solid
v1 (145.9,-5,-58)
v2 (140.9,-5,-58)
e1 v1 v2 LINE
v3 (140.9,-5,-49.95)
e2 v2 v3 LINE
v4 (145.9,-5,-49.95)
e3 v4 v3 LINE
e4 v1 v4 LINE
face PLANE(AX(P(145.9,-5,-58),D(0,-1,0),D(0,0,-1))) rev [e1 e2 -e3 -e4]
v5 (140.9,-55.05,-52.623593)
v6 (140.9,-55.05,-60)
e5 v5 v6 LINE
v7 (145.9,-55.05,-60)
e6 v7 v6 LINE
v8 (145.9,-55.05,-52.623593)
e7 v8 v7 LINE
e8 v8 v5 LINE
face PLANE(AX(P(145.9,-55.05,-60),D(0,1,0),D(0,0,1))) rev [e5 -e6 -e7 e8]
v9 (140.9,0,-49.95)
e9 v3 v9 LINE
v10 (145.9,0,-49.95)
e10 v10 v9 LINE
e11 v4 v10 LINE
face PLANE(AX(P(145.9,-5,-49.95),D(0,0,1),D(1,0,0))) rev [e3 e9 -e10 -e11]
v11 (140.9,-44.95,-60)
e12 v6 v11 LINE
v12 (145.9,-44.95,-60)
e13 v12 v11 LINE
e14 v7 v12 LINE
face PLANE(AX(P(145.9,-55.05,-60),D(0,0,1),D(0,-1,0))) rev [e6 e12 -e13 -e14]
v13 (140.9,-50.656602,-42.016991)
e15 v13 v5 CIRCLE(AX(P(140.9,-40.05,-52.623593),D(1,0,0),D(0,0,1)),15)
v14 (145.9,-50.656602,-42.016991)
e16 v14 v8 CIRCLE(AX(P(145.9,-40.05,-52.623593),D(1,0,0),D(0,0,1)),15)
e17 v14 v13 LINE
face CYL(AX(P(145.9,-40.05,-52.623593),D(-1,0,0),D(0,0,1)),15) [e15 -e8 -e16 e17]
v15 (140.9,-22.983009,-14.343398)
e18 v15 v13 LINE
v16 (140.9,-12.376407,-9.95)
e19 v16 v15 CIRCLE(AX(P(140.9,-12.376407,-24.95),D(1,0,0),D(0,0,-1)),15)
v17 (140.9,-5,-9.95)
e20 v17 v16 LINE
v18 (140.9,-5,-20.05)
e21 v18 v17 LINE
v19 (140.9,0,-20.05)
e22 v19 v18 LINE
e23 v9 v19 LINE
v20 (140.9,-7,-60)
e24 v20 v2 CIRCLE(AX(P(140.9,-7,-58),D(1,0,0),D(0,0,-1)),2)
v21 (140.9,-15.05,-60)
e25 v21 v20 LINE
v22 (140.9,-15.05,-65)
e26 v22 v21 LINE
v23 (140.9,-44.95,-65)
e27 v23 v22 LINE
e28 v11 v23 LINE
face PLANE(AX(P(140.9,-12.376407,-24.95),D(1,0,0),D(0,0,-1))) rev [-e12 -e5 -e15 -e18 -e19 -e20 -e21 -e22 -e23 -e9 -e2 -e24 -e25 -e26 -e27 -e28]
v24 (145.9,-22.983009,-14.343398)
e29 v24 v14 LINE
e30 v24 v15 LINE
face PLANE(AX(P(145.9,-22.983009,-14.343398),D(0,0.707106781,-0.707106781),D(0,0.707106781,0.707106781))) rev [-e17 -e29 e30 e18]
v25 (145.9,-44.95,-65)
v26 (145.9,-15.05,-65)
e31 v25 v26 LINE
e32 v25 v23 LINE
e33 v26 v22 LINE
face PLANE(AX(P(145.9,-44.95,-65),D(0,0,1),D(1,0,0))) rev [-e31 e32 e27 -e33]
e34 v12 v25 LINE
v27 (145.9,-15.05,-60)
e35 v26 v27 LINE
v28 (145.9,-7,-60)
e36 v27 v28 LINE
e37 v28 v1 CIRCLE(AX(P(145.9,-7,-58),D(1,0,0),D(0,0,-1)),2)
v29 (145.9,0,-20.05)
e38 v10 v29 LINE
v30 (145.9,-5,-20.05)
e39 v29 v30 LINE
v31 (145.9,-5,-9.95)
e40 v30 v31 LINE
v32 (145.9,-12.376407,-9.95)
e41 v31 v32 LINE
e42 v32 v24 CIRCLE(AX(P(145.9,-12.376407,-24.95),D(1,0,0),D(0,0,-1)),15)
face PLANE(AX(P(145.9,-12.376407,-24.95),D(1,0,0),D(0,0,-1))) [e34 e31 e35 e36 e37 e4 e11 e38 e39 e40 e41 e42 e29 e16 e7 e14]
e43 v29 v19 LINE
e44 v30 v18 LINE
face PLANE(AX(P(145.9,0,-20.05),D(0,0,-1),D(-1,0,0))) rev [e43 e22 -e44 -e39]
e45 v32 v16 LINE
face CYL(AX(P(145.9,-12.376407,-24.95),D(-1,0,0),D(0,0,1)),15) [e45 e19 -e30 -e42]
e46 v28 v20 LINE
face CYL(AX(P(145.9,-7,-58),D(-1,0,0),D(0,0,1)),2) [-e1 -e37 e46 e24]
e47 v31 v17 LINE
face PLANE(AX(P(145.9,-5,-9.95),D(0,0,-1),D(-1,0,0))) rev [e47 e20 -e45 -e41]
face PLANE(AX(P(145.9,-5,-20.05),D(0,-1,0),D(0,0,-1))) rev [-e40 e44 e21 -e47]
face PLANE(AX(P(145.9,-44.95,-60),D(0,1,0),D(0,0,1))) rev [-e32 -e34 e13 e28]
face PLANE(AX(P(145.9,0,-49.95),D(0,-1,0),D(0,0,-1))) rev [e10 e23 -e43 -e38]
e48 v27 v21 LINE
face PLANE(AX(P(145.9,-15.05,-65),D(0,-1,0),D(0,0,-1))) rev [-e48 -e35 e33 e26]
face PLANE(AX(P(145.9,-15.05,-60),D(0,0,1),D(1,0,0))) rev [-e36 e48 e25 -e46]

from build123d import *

# Parameters (mm, degrees)
BODY_MOVE_COPY1_START         = -65
BODY_MOVE_COPY1_OUTLINE_W     = 5.1
BODY_MOVE_COPY1_OUTLINE_H     = 30.1
BODY_MOVE_COPY1_OUTLINE_R     = 2.6
BODY_MOVE_COPY1_OUTLINE_R_2   = 3.1
BODY_MOVE_COPY1_OUTLINE_R_3   = 1.55
BODY_MOVE_COPY1_OUTLINE_W_2   = 30.5
BODY_MOVE_COPY1_OUTLINE_H_2   = 14.5
BODY_MOVE_COPY1_DEPTH         = 5
BODY_MOVE_COPY1_START_2       = -5
BODY_MOVE_COPY1_2_OUTLINE_W   = 10
BODY_MOVE_COPY1_2_OUTLINE_H   = 5.2
BODY_MOVE_COPY1_2_OUTLINE_R   = 1.6
BODY_MOVE_COPY1_2_OUTLINE_W_2 = 5.1
BODY_MOVE_COPY1_2_OUTLINE_H_2 = 30.1
BODY_MOVE_COPY1_2_DEPTH       = 5
BOSS_EXTRUDE2_DEPTH           = 5


# Read off the part's stored shape, not the designer's step: Body-Move/Copy1
with BuildPart() as part:
    # Body-Move/Copy1 outline → Body-Move/Copy1 (new body)
    with BuildSketch(Plane.XY.offset(BODY_MOVE_COPY1_START)):
        Polygon((24.9, -310), (24.9, -305), (100.2, -305), (100.2, -310), (150, -310), (150, -5), (10.65, -5), (10.65, 0), (-10.65, 0), (-10.65, -5), (-150, -5), (-150, -310), (-100.2, -310), (-100.2, -305), (-24.9, -305), (-24.9, -310), align=None)
        with Locations((-143.45, -280)):
            Rectangle(BODY_MOVE_COPY1_OUTLINE_W, BODY_MOVE_COPY1_OUTLINE_H, mode=Mode.SUBTRACT)
        with Locations((-90, -157.5)):
            Circle(BODY_MOVE_COPY1_OUTLINE_R, mode=Mode.SUBTRACT)
        with Locations((-60, -157.5)):
            Circle(BODY_MOVE_COPY1_OUTLINE_R, mode=Mode.SUBTRACT)
        with Locations((143.45, -280)):
            Rectangle(BODY_MOVE_COPY1_OUTLINE_W, BODY_MOVE_COPY1_OUTLINE_H, mode=Mode.SUBTRACT)
        with Locations((65, -157.5)):
            Circle(BODY_MOVE_COPY1_OUTLINE_R_2, mode=Mode.SUBTRACT)
        with Locations((85, -157.5)):
            Circle(BODY_MOVE_COPY1_OUTLINE_R_2, mode=Mode.SUBTRACT)
        with Locations((-90, -137.5)):
            Circle(BODY_MOVE_COPY1_OUTLINE_R_3, mode=Mode.SUBTRACT)
        with Locations((-60, -137.5)):
            Circle(BODY_MOVE_COPY1_OUTLINE_R_3, mode=Mode.SUBTRACT)
        with Locations((-75, -100.25)):
            Rectangle(BODY_MOVE_COPY1_OUTLINE_W_2, BODY_MOVE_COPY1_OUTLINE_H_2, mode=Mode.SUBTRACT)
        with Locations((-143.45, -30)):
            Rectangle(BODY_MOVE_COPY1_OUTLINE_W, BODY_MOVE_COPY1_OUTLINE_H, mode=Mode.SUBTRACT)
        with Locations((143.45, -30)):
            Rectangle(BODY_MOVE_COPY1_OUTLINE_W, BODY_MOVE_COPY1_OUTLINE_H, mode=Mode.SUBTRACT)
    extrude(amount=BODY_MOVE_COPY1_DEPTH)


with BuildPart() as body_2:
    # Body-Move_Copy1 2 outline → Body-Move_Copy1 2 (new body)
    with BuildSketch(Plane(origin=(0, 0, 0), x_dir=(1, 0, 0), z_dir=(0, 1, 0)).offset(BODY_MOVE_COPY1_START_2)):
        with BuildLine():
            ThreePointArc((-95, -65), (-93.535533906, -61.464466094), (-90, -60))
            Line((-90, -60), (90, -60))
            ThreePointArc((90, -60), (93.535533906, -61.464466094), (95, -65))
            Line((95, -65), (95, -70))
            ThreePointArc((95, -70), (96.464466094, -73.535533906), (100, -75))
            Line((100, -75), (115, -75))
            ThreePointArc((115, -75), (118.535533906, -73.535533906), (120, -70))
            Line((120, -70), (120, -60))
            Line((120, -60), (145.606601718, -34.393398282))
            ThreePointArc((145.606601718, -34.393398282), (148.858192988, -29.52704805), (150, -23.786796564))
            Line((150, -23.786796564), (150, 65))
            Line((150, 65), (10.75, 65))
            Line((10.75, 65), (10.75, 60))
            Line((10.75, 60), (-10.75, 60))
            Line((-10.75, 60), (-10.75, 65))
            Line((-10.75, 65), (-150, 65))
            Line((-150, 65), (-150, -23.786796564))
            ThreePointArc((-150, -23.786796564), (-148.858192988, -29.52704805), (-145.606601718, -34.393398282))
            Line((-145.606601718, -34.393398282), (-120, -60))
            Line((-120, -60), (-120, -70))
            ThreePointArc((-120, -70), (-118.535533906, -73.535533906), (-115, -75))
            Line((-115, -75), (-100, -75))
            ThreePointArc((-100, -75), (-96.464466094, -73.535533906), (-95, -70))
            Line((-95, -70), (-95, -65))
        make_face()
        with Locations((-107.5, -67.5)):
            Rectangle(BODY_MOVE_COPY1_2_OUTLINE_W, BODY_MOVE_COPY1_2_OUTLINE_H, mode=Mode.SUBTRACT)
        with Locations((-110, -52.5)):
            Circle(BODY_MOVE_COPY1_2_OUTLINE_R, mode=Mode.SUBTRACT)
        with Locations((-5, -52.5)):
            Circle(BODY_MOVE_COPY1_2_OUTLINE_R, mode=Mode.SUBTRACT)
        with Locations((5, -52.5)):
            Circle(BODY_MOVE_COPY1_2_OUTLINE_R, mode=Mode.SUBTRACT)
        with Locations((107.5, -67.5)):
            Rectangle(BODY_MOVE_COPY1_2_OUTLINE_W, BODY_MOVE_COPY1_2_OUTLINE_H, mode=Mode.SUBTRACT)
        with Locations((110, -52.5)):
            Circle(BODY_MOVE_COPY1_2_OUTLINE_R, mode=Mode.SUBTRACT)
        with Locations((-143.45, 35)):
            Rectangle(BODY_MOVE_COPY1_2_OUTLINE_W_2, BODY_MOVE_COPY1_2_OUTLINE_H_2, mode=Mode.SUBTRACT)
        with Locations((-110, 52.5)):
            Circle(BODY_MOVE_COPY1_2_OUTLINE_R, mode=Mode.SUBTRACT)
        with Locations((-5, 52.5)):
            Circle(BODY_MOVE_COPY1_2_OUTLINE_R, mode=Mode.SUBTRACT)
        with BuildLine():
            Line((131.606601718, -30.178932188), (115.267766953, -46.517766953))
            ThreePointArc((115.267766953, -46.517766953), (114.456708581, -47.059698831), (113.5, -47.25))
            Line((113.5, -47.25), (107.75, -47.25))
            ThreePointArc((107.75, -47.25), (105.982233047, -47.982233047), (105.25, -49.75))
            Line((105.25, -49.75), (105.25, -53.5))
            ThreePointArc((105.25, -53.5), (104.517766953, -55.267766953), (102.75, -56))
            Line((102.75, -56), (13.25, -56))
            ThreePointArc((13.25, -56), (11.482233047, -55.267766953), (10.75, -53.5))
            Line((10.75, -53.5), (10.75, -49.75))
            ThreePointArc((10.75, -49.75), (10.017766953, -47.982233047), (8.25, -47.25))
            Line((8.25, -47.25), (-8.25, -47.25))
            ThreePointArc((-8.25, -47.25), (-10.017766953, -47.982233047), (-10.75, -49.75))
            Line((-10.75, -49.75), (-10.75, -53.5))
            ThreePointArc((-10.75, -53.5), (-11.482233047, -55.267766953), (-13.25, -56))
            Line((-13.25, -56), (-102.75, -56))
            ThreePointArc((-102.75, -56), (-104.517766953, -55.267766953), (-105.25, -53.5))
            Line((-105.25, -53.5), (-105.25, -49.75))
            ThreePointArc((-105.25, -49.75), (-105.982233047, -47.982233047), (-107.75, -47.25))
            Line((-107.75, -47.25), (-113.5, -47.25))
            ThreePointArc((-113.5, -47.25), (-115.267766953, -46.517766953), (-116, -44.75))
            Line((-116, -44.75), (-116, 44.75))
            ThreePointArc((-116, 44.75), (-115.267766953, 46.517766953), (-113.5, 47.25))
            Line((-113.5, 47.25), (-107.75, 47.25))
            ThreePointArc((-107.75, 47.25), (-105.982233047, 47.982233047), (-105.25, 49.75))
            Line((-105.25, 49.75), (-105.25, 53.5))
            ThreePointArc((-105.25, 53.5), (-104.517766953, 55.267766953), (-102.75, 56))
            Line((-102.75, 56), (-13.25, 56))
            ThreePointArc((-13.25, 56), (-11.482233047, 55.267766953), (-10.75, 53.5))
            Line((-10.75, 53.5), (-10.75, 49.75))
            ThreePointArc((-10.75, 49.75), (-10.017766953, 47.982233047), (-8.25, 47.25))
            Line((-8.25, 47.25), (8.25, 47.25))
            ThreePointArc((8.25, 47.25), (10.017766953, 47.982233047), (10.75, 49.75))
            Line((10.75, 49.75), (10.75, 53.5))
            ThreePointArc((10.75, 53.5), (11.482233047, 55.267766953), (13.25, 56))
            Line((13.25, 56), (102.75, 56))
            ThreePointArc((102.75, 56), (104.517766953, 55.267766953), (105.25, 53.5))
            Line((105.25, 53.5), (105.25, 49.75))
            ThreePointArc((105.25, 49.75), (105.982233047, 47.982233047), (107.75, 47.25))
            Line((107.75, 47.25), (113.5, 47.25))
            ThreePointArc((113.5, 47.25), (115.267766953, 47.982233047), (116, 49.75))
            Line((116, 49.75), (116, 53.5))
            ThreePointArc((116, 53.5), (116.732233047, 55.267766953), (118.5, 56))
            Line((118.5, 56), (133.5, 56))
            ThreePointArc((133.5, 56), (135.267766953, 55.267766953), (136, 53.5))
            Line((136, 53.5), (136, -19.57233047))
            ThreePointArc((136, -19.57233047), (134.858192988, -25.312581956), (131.606601718, -30.178932188))
        make_face(mode=Mode.SUBTRACT)
        with Locations((5, 52.5)):
            Circle(BODY_MOVE_COPY1_2_OUTLINE_R, mode=Mode.SUBTRACT)
        with Locations((143.45, 35)):
            Rectangle(BODY_MOVE_COPY1_2_OUTLINE_W_2, BODY_MOVE_COPY1_2_OUTLINE_H_2, mode=Mode.SUBTRACT)
        with Locations((110, 52.5)):
            Circle(BODY_MOVE_COPY1_2_OUTLINE_R, mode=Mode.SUBTRACT)
    extrude(amount=BODY_MOVE_COPY1_2_DEPTH)


with BuildPart() as body_3:
    # Sketch18 → Boss-Extrude2 (new body)
    with BuildSketch(Plane(origin=(140.9, 0, 0), x_dir=(0, 0, -1), z_dir=(1, 0, 0))):
        with BuildLine():
            Line((20.05, 0), (20.05, -5))
            Line((20.05, -5), (9.95, -5))
            Line((9.95, -5), (9.95, -12.376406871))
            ThreePointArc((9.95, -12.376406871), (11.091807012, -18.116658357), (14.343398282, -22.983008589))
            Line((14.343398282, -22.983008589), (42.016991411, -50.656601718))
            ThreePointArc((42.016991411, -50.656601718), (46.883341643, -53.908192988), (52.623593129, -55.05))
            Line((52.623593129, -55.05), (60, -55.05))
            Line((60, -55.05), (60, -44.95))
            Line((60, -44.95), (65, -44.95))
            Line((65, -44.95), (65, -15.05))
            Line((65, -15.05), (60, -15.05))
            Line((60, -15.05), (60, -7))
            ThreePointArc((60, -7), (59.414213562, -5.585786438), (58, -5))
            Line((58, -5), (49.95, -5))
            Line((49.95, -5), (49.95, 0))
            Line((49.95, 0), (20.05, 0))
        make_face()
    extrude(amount=BOSS_EXTRUDE2_DEPTH)


solid = body_3.part
